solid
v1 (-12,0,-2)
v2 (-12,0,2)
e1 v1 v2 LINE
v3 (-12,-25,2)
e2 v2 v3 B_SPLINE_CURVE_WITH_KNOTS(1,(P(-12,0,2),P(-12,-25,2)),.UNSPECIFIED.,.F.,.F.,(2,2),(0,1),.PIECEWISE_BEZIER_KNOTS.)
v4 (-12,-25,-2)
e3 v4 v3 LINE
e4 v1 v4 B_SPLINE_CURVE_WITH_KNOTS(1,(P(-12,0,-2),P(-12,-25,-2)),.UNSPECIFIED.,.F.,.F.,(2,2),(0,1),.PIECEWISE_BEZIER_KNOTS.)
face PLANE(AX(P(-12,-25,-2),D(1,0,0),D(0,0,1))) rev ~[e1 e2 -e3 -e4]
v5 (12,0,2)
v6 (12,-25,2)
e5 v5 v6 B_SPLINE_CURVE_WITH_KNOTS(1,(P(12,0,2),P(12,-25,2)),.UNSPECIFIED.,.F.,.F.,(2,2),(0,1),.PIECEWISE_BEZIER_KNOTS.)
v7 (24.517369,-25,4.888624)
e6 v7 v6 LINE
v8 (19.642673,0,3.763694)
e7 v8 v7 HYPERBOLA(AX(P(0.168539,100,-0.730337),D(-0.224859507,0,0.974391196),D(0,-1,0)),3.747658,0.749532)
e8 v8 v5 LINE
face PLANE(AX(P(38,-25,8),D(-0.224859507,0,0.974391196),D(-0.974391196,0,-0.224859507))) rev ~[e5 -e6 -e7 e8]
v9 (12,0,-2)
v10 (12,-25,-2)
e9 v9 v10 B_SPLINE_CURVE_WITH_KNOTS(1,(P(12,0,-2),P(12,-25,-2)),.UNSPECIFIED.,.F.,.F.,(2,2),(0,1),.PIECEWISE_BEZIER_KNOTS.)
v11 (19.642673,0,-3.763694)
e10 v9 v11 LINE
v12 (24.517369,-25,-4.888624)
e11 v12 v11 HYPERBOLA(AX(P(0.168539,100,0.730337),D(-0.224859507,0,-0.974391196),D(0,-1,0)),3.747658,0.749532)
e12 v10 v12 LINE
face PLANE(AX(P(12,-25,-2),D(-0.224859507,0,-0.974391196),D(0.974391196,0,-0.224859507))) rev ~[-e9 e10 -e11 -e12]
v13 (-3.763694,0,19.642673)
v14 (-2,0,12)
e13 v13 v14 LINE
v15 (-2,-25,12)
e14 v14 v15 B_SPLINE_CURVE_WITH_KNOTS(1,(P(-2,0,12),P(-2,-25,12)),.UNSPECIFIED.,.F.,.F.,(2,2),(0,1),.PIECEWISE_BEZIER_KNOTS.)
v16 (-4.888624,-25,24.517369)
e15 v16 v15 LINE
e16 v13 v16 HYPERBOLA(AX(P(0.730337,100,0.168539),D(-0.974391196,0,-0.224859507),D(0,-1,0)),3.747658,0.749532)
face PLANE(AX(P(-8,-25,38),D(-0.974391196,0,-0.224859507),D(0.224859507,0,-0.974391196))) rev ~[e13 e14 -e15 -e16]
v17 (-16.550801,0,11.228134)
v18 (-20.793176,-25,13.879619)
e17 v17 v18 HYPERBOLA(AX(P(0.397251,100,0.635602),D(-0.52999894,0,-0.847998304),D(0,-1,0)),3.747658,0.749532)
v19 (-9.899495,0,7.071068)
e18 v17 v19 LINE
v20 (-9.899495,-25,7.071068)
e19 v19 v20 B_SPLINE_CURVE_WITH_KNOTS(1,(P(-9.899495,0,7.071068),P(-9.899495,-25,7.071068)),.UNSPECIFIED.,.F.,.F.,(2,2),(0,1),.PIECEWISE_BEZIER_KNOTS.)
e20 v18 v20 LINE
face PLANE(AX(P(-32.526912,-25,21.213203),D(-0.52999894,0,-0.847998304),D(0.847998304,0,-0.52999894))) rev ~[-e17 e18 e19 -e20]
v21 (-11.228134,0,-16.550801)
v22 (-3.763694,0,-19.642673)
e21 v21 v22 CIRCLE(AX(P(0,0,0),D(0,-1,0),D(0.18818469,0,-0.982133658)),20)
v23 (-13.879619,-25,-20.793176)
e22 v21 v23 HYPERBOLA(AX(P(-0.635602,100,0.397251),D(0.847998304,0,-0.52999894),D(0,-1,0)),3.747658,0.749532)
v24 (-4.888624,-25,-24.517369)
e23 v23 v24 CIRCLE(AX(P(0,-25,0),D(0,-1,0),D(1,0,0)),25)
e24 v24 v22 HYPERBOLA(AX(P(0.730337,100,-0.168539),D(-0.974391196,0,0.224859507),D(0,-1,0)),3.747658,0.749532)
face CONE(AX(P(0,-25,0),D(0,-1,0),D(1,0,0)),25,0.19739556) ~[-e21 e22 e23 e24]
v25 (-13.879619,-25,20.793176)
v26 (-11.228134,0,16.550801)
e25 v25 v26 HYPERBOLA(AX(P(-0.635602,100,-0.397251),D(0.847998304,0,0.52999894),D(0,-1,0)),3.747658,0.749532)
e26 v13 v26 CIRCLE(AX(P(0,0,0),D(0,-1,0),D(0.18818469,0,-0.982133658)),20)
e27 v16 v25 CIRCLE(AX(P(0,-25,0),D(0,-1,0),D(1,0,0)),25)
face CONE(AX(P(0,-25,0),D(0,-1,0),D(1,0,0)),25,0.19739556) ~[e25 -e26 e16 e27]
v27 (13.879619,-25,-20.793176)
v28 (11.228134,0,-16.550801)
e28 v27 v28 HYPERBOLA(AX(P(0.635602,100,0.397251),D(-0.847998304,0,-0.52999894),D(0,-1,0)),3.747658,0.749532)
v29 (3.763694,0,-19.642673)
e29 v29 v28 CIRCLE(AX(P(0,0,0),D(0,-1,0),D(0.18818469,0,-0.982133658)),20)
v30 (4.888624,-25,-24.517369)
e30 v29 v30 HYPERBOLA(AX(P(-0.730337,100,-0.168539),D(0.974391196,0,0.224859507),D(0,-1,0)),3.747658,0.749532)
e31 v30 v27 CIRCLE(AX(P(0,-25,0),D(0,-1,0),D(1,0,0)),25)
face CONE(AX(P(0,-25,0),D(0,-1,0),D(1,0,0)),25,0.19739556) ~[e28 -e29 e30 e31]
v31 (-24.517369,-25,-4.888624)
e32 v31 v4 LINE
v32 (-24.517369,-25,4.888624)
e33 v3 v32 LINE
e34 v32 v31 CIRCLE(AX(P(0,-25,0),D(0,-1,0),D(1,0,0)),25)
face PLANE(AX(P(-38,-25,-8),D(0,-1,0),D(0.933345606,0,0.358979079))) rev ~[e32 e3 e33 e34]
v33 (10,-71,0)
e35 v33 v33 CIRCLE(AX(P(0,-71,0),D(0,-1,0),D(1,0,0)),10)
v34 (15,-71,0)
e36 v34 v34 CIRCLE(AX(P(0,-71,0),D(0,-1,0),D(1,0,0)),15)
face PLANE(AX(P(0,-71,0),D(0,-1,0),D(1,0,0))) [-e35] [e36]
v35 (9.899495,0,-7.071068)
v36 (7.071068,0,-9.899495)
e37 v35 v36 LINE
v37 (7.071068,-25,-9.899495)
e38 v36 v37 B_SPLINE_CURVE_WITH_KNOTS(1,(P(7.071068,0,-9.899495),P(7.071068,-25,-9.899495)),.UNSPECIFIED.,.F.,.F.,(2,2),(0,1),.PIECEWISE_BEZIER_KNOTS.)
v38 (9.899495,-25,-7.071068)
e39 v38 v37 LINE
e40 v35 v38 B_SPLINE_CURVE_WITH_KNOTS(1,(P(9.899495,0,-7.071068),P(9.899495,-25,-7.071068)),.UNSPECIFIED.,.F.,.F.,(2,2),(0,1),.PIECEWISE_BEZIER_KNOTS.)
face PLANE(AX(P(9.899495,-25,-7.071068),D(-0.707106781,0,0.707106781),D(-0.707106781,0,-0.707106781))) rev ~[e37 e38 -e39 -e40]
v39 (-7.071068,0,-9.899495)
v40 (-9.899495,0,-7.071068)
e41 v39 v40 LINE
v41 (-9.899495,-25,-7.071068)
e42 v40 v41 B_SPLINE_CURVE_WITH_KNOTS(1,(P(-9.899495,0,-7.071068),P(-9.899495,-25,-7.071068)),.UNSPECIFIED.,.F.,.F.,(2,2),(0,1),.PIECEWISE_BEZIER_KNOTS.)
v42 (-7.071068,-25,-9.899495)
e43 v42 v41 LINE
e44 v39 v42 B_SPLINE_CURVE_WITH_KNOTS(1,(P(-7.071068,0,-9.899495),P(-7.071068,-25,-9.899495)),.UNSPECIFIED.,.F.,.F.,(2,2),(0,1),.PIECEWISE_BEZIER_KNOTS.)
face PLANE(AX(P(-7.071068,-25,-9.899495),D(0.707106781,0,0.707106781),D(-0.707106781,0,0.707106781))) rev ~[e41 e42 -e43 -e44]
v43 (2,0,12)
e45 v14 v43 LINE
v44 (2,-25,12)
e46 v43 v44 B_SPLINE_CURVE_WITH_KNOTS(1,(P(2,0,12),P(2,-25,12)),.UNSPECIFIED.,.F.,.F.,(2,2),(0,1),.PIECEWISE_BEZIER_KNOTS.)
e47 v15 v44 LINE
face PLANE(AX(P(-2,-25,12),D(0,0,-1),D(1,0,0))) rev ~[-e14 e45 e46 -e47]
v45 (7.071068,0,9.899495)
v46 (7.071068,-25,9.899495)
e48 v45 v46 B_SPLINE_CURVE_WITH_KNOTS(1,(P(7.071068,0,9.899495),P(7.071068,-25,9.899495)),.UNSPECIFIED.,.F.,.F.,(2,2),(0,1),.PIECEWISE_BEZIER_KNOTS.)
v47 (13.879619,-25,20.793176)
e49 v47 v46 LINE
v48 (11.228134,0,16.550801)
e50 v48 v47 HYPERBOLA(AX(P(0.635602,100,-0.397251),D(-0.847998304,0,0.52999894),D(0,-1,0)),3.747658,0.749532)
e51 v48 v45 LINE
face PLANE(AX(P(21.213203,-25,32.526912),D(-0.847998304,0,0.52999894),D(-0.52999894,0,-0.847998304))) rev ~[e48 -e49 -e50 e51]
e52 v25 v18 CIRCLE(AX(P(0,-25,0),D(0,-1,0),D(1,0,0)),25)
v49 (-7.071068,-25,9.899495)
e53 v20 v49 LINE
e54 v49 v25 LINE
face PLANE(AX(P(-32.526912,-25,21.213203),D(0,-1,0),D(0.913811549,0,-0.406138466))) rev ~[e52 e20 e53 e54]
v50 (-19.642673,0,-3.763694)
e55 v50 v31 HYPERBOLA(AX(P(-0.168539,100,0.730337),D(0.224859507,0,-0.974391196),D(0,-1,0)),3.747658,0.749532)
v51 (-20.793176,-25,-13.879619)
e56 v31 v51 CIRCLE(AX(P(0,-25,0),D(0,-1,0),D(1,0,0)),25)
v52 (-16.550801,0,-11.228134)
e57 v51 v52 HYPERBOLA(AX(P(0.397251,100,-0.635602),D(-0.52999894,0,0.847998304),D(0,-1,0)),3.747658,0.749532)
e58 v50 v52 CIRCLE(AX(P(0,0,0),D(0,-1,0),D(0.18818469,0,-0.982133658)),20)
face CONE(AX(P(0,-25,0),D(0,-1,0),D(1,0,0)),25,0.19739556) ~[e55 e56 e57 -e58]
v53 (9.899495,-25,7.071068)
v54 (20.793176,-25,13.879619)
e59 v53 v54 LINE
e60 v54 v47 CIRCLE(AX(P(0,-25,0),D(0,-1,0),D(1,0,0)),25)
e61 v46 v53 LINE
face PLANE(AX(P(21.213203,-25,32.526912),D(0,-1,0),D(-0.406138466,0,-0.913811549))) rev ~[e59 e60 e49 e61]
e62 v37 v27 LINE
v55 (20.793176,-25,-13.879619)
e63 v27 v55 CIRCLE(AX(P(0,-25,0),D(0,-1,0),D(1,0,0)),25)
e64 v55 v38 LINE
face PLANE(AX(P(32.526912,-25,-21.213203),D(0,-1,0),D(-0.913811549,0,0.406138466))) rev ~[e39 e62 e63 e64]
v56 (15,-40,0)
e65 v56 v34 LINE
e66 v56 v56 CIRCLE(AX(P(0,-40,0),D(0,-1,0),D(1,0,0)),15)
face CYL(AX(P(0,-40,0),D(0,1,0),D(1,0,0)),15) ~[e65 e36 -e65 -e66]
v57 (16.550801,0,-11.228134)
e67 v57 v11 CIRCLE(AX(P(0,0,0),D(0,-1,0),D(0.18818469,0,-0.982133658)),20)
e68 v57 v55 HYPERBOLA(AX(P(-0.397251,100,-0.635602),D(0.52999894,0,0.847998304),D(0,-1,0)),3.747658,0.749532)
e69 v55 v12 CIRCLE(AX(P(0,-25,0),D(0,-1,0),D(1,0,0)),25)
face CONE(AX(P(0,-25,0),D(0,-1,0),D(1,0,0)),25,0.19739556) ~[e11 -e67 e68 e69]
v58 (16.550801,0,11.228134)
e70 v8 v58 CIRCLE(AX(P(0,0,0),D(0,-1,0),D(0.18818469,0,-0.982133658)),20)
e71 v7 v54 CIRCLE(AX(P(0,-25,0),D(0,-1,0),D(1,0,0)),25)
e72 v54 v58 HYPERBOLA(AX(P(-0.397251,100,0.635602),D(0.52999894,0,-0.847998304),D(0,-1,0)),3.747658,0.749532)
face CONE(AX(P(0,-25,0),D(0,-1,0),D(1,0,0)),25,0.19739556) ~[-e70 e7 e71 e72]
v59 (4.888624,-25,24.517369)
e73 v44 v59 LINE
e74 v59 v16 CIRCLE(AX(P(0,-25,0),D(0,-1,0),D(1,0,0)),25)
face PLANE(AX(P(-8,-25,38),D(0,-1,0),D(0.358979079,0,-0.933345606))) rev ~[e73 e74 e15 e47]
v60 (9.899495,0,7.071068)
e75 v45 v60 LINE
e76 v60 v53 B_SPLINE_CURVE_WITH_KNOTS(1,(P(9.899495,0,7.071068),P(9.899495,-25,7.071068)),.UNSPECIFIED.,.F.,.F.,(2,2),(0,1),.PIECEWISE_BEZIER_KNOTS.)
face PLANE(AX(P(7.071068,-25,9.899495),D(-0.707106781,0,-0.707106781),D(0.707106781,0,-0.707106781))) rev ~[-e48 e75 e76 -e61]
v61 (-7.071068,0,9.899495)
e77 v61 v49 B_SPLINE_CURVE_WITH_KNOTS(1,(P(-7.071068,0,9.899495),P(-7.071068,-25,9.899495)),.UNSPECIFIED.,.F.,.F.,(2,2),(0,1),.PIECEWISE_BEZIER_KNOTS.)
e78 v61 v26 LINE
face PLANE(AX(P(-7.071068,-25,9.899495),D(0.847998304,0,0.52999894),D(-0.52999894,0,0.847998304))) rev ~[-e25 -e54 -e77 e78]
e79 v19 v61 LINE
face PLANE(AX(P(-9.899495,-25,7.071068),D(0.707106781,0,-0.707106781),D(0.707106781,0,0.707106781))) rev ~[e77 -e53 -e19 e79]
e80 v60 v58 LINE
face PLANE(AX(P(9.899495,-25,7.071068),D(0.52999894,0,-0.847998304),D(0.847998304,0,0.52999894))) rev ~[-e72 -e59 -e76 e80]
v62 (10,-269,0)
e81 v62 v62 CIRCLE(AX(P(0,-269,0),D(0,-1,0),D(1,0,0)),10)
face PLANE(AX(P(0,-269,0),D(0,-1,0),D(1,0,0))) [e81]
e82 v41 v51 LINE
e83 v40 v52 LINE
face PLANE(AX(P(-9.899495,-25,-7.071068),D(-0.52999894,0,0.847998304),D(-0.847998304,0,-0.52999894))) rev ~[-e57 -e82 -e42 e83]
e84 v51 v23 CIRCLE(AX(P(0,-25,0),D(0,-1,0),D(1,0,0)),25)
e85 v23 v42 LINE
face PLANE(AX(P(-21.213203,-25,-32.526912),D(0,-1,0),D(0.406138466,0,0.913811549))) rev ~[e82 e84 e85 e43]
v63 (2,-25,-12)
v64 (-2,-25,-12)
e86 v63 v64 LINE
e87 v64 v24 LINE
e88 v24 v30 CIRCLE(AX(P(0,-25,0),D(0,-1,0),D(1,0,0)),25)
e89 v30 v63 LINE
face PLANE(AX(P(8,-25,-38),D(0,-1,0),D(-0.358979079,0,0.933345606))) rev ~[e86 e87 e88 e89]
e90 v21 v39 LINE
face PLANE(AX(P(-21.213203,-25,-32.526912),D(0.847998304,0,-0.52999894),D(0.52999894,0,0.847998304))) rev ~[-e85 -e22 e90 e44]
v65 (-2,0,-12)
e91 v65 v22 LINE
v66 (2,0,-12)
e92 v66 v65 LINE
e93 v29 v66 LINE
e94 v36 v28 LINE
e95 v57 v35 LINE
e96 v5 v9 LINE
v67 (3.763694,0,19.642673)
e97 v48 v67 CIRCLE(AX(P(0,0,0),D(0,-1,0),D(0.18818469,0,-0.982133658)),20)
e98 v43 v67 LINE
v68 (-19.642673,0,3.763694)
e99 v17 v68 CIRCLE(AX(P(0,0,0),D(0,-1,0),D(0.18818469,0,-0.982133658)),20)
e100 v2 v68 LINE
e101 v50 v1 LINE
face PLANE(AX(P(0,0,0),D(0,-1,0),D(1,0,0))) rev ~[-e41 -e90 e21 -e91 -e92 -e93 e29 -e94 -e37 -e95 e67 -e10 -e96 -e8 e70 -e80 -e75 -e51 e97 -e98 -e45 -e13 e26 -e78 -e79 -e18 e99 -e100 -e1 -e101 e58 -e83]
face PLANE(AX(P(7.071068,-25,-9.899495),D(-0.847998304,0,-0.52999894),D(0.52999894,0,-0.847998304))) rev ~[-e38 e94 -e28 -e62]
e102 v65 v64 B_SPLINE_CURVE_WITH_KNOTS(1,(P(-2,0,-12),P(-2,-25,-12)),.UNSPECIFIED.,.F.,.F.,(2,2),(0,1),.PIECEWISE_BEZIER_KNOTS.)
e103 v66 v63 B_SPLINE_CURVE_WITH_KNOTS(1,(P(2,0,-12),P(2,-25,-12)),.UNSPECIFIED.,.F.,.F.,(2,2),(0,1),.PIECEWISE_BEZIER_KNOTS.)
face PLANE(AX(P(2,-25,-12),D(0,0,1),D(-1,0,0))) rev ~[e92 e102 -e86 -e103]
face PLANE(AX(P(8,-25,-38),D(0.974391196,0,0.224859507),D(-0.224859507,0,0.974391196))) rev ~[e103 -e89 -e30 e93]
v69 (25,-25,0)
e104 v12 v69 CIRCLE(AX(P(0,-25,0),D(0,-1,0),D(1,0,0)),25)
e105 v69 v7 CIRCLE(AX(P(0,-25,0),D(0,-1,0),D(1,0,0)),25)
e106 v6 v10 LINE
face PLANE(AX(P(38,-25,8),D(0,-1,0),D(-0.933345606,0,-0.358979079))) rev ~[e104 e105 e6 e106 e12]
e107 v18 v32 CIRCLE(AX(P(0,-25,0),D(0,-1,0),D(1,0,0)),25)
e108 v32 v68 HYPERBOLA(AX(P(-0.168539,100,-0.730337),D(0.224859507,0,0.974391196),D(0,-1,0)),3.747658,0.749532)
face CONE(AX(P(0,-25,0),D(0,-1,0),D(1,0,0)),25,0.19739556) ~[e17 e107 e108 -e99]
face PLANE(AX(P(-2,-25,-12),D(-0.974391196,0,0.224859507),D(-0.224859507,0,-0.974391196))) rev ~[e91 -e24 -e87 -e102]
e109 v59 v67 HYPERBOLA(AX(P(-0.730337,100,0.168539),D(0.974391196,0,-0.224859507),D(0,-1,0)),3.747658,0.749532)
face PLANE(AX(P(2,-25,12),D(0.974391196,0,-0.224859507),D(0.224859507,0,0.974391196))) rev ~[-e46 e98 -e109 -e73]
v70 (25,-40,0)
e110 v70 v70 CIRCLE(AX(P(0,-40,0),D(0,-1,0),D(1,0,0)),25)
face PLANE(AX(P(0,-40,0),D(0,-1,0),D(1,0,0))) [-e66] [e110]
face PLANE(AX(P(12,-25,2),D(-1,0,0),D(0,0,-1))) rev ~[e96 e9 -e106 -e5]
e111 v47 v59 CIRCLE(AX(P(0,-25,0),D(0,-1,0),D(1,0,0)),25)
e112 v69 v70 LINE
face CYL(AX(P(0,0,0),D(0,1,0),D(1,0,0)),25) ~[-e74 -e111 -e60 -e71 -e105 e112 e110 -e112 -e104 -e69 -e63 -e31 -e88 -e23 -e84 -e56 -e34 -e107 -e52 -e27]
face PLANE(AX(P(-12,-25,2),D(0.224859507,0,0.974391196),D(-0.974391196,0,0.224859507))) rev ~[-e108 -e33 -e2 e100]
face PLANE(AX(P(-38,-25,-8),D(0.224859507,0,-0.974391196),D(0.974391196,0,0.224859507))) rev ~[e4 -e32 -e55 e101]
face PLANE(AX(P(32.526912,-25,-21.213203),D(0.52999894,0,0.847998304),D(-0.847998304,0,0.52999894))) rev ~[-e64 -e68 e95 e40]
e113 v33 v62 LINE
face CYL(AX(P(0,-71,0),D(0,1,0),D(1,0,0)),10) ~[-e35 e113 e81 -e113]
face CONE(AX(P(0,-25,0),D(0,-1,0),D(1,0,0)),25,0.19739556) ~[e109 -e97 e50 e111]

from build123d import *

# Parameters (mm, degrees)
F0_R            = 25
F1_DEPTH        = 40
F2_SIZE2        = 5
F2_SIZE         = 25
F7_COPIES_COUNT = 8
F8_R            = 15
F9_DEPTH        = 31
F10_R           = 10
F11_DEPTH       = 198


# Not quite as in the source:
# - a pattern or mirror of a feature is missing from the dataset's text; its kind, count and spacing are read off the source's solid


with BuildPart() as f1:
    # F0 (on Front) → F1 (new body)
    with BuildSketch(Plane.XZ):
        Circle(F0_R)
    extrude(amount=F1_DEPTH)

    # F2
    f2_edges = [f1.edges().sort_by_distance(p)[0] for p in [
        (-25, 0, 0),
    ]]
    f2_side = f1.faces().sort_by_distance((-25, -20, 0))[0]
    chamfer(f2_edges, length=F2_SIZE, length2=F2_SIZE2, reference=f2_side)

    # F4 (on Front) → F7 section 0
    with BuildSketch(Plane.XZ):
        Polygon((8, -38), (2, -12), (-2, -12), (-8, -38), align=None)
    # F5 (on offset) → F7 section 1
    with BuildSketch(Plane.XZ.offset(25)):
        Polygon((8, -38), (2, -12), (-2, -12), (-8, -38), align=None)
    f7 = loft(mode=Mode.SUBTRACT)

    # F7_copies: F7 ×8 about axis
    f7_copies_axis = Axis((0, 0, 0), (0, 1, 0))
    for i in range(1, F7_COPIES_COUNT):
        add(f7.rotate(f7_copies_axis, i * 360 / F7_COPIES_COUNT), mode=Mode.SUBTRACT)

    # F8 (on face) → F9 (join)
    with BuildSketch(Plane.XZ.offset(40)):
        Circle(F8_R)
    extrude(amount=F9_DEPTH)

    # F10 (on face) → F11 (join)
    with BuildSketch(Plane.XZ.offset(71)):
        Circle(F10_R)
    extrude(amount=F11_DEPTH)


solid = f1.part
